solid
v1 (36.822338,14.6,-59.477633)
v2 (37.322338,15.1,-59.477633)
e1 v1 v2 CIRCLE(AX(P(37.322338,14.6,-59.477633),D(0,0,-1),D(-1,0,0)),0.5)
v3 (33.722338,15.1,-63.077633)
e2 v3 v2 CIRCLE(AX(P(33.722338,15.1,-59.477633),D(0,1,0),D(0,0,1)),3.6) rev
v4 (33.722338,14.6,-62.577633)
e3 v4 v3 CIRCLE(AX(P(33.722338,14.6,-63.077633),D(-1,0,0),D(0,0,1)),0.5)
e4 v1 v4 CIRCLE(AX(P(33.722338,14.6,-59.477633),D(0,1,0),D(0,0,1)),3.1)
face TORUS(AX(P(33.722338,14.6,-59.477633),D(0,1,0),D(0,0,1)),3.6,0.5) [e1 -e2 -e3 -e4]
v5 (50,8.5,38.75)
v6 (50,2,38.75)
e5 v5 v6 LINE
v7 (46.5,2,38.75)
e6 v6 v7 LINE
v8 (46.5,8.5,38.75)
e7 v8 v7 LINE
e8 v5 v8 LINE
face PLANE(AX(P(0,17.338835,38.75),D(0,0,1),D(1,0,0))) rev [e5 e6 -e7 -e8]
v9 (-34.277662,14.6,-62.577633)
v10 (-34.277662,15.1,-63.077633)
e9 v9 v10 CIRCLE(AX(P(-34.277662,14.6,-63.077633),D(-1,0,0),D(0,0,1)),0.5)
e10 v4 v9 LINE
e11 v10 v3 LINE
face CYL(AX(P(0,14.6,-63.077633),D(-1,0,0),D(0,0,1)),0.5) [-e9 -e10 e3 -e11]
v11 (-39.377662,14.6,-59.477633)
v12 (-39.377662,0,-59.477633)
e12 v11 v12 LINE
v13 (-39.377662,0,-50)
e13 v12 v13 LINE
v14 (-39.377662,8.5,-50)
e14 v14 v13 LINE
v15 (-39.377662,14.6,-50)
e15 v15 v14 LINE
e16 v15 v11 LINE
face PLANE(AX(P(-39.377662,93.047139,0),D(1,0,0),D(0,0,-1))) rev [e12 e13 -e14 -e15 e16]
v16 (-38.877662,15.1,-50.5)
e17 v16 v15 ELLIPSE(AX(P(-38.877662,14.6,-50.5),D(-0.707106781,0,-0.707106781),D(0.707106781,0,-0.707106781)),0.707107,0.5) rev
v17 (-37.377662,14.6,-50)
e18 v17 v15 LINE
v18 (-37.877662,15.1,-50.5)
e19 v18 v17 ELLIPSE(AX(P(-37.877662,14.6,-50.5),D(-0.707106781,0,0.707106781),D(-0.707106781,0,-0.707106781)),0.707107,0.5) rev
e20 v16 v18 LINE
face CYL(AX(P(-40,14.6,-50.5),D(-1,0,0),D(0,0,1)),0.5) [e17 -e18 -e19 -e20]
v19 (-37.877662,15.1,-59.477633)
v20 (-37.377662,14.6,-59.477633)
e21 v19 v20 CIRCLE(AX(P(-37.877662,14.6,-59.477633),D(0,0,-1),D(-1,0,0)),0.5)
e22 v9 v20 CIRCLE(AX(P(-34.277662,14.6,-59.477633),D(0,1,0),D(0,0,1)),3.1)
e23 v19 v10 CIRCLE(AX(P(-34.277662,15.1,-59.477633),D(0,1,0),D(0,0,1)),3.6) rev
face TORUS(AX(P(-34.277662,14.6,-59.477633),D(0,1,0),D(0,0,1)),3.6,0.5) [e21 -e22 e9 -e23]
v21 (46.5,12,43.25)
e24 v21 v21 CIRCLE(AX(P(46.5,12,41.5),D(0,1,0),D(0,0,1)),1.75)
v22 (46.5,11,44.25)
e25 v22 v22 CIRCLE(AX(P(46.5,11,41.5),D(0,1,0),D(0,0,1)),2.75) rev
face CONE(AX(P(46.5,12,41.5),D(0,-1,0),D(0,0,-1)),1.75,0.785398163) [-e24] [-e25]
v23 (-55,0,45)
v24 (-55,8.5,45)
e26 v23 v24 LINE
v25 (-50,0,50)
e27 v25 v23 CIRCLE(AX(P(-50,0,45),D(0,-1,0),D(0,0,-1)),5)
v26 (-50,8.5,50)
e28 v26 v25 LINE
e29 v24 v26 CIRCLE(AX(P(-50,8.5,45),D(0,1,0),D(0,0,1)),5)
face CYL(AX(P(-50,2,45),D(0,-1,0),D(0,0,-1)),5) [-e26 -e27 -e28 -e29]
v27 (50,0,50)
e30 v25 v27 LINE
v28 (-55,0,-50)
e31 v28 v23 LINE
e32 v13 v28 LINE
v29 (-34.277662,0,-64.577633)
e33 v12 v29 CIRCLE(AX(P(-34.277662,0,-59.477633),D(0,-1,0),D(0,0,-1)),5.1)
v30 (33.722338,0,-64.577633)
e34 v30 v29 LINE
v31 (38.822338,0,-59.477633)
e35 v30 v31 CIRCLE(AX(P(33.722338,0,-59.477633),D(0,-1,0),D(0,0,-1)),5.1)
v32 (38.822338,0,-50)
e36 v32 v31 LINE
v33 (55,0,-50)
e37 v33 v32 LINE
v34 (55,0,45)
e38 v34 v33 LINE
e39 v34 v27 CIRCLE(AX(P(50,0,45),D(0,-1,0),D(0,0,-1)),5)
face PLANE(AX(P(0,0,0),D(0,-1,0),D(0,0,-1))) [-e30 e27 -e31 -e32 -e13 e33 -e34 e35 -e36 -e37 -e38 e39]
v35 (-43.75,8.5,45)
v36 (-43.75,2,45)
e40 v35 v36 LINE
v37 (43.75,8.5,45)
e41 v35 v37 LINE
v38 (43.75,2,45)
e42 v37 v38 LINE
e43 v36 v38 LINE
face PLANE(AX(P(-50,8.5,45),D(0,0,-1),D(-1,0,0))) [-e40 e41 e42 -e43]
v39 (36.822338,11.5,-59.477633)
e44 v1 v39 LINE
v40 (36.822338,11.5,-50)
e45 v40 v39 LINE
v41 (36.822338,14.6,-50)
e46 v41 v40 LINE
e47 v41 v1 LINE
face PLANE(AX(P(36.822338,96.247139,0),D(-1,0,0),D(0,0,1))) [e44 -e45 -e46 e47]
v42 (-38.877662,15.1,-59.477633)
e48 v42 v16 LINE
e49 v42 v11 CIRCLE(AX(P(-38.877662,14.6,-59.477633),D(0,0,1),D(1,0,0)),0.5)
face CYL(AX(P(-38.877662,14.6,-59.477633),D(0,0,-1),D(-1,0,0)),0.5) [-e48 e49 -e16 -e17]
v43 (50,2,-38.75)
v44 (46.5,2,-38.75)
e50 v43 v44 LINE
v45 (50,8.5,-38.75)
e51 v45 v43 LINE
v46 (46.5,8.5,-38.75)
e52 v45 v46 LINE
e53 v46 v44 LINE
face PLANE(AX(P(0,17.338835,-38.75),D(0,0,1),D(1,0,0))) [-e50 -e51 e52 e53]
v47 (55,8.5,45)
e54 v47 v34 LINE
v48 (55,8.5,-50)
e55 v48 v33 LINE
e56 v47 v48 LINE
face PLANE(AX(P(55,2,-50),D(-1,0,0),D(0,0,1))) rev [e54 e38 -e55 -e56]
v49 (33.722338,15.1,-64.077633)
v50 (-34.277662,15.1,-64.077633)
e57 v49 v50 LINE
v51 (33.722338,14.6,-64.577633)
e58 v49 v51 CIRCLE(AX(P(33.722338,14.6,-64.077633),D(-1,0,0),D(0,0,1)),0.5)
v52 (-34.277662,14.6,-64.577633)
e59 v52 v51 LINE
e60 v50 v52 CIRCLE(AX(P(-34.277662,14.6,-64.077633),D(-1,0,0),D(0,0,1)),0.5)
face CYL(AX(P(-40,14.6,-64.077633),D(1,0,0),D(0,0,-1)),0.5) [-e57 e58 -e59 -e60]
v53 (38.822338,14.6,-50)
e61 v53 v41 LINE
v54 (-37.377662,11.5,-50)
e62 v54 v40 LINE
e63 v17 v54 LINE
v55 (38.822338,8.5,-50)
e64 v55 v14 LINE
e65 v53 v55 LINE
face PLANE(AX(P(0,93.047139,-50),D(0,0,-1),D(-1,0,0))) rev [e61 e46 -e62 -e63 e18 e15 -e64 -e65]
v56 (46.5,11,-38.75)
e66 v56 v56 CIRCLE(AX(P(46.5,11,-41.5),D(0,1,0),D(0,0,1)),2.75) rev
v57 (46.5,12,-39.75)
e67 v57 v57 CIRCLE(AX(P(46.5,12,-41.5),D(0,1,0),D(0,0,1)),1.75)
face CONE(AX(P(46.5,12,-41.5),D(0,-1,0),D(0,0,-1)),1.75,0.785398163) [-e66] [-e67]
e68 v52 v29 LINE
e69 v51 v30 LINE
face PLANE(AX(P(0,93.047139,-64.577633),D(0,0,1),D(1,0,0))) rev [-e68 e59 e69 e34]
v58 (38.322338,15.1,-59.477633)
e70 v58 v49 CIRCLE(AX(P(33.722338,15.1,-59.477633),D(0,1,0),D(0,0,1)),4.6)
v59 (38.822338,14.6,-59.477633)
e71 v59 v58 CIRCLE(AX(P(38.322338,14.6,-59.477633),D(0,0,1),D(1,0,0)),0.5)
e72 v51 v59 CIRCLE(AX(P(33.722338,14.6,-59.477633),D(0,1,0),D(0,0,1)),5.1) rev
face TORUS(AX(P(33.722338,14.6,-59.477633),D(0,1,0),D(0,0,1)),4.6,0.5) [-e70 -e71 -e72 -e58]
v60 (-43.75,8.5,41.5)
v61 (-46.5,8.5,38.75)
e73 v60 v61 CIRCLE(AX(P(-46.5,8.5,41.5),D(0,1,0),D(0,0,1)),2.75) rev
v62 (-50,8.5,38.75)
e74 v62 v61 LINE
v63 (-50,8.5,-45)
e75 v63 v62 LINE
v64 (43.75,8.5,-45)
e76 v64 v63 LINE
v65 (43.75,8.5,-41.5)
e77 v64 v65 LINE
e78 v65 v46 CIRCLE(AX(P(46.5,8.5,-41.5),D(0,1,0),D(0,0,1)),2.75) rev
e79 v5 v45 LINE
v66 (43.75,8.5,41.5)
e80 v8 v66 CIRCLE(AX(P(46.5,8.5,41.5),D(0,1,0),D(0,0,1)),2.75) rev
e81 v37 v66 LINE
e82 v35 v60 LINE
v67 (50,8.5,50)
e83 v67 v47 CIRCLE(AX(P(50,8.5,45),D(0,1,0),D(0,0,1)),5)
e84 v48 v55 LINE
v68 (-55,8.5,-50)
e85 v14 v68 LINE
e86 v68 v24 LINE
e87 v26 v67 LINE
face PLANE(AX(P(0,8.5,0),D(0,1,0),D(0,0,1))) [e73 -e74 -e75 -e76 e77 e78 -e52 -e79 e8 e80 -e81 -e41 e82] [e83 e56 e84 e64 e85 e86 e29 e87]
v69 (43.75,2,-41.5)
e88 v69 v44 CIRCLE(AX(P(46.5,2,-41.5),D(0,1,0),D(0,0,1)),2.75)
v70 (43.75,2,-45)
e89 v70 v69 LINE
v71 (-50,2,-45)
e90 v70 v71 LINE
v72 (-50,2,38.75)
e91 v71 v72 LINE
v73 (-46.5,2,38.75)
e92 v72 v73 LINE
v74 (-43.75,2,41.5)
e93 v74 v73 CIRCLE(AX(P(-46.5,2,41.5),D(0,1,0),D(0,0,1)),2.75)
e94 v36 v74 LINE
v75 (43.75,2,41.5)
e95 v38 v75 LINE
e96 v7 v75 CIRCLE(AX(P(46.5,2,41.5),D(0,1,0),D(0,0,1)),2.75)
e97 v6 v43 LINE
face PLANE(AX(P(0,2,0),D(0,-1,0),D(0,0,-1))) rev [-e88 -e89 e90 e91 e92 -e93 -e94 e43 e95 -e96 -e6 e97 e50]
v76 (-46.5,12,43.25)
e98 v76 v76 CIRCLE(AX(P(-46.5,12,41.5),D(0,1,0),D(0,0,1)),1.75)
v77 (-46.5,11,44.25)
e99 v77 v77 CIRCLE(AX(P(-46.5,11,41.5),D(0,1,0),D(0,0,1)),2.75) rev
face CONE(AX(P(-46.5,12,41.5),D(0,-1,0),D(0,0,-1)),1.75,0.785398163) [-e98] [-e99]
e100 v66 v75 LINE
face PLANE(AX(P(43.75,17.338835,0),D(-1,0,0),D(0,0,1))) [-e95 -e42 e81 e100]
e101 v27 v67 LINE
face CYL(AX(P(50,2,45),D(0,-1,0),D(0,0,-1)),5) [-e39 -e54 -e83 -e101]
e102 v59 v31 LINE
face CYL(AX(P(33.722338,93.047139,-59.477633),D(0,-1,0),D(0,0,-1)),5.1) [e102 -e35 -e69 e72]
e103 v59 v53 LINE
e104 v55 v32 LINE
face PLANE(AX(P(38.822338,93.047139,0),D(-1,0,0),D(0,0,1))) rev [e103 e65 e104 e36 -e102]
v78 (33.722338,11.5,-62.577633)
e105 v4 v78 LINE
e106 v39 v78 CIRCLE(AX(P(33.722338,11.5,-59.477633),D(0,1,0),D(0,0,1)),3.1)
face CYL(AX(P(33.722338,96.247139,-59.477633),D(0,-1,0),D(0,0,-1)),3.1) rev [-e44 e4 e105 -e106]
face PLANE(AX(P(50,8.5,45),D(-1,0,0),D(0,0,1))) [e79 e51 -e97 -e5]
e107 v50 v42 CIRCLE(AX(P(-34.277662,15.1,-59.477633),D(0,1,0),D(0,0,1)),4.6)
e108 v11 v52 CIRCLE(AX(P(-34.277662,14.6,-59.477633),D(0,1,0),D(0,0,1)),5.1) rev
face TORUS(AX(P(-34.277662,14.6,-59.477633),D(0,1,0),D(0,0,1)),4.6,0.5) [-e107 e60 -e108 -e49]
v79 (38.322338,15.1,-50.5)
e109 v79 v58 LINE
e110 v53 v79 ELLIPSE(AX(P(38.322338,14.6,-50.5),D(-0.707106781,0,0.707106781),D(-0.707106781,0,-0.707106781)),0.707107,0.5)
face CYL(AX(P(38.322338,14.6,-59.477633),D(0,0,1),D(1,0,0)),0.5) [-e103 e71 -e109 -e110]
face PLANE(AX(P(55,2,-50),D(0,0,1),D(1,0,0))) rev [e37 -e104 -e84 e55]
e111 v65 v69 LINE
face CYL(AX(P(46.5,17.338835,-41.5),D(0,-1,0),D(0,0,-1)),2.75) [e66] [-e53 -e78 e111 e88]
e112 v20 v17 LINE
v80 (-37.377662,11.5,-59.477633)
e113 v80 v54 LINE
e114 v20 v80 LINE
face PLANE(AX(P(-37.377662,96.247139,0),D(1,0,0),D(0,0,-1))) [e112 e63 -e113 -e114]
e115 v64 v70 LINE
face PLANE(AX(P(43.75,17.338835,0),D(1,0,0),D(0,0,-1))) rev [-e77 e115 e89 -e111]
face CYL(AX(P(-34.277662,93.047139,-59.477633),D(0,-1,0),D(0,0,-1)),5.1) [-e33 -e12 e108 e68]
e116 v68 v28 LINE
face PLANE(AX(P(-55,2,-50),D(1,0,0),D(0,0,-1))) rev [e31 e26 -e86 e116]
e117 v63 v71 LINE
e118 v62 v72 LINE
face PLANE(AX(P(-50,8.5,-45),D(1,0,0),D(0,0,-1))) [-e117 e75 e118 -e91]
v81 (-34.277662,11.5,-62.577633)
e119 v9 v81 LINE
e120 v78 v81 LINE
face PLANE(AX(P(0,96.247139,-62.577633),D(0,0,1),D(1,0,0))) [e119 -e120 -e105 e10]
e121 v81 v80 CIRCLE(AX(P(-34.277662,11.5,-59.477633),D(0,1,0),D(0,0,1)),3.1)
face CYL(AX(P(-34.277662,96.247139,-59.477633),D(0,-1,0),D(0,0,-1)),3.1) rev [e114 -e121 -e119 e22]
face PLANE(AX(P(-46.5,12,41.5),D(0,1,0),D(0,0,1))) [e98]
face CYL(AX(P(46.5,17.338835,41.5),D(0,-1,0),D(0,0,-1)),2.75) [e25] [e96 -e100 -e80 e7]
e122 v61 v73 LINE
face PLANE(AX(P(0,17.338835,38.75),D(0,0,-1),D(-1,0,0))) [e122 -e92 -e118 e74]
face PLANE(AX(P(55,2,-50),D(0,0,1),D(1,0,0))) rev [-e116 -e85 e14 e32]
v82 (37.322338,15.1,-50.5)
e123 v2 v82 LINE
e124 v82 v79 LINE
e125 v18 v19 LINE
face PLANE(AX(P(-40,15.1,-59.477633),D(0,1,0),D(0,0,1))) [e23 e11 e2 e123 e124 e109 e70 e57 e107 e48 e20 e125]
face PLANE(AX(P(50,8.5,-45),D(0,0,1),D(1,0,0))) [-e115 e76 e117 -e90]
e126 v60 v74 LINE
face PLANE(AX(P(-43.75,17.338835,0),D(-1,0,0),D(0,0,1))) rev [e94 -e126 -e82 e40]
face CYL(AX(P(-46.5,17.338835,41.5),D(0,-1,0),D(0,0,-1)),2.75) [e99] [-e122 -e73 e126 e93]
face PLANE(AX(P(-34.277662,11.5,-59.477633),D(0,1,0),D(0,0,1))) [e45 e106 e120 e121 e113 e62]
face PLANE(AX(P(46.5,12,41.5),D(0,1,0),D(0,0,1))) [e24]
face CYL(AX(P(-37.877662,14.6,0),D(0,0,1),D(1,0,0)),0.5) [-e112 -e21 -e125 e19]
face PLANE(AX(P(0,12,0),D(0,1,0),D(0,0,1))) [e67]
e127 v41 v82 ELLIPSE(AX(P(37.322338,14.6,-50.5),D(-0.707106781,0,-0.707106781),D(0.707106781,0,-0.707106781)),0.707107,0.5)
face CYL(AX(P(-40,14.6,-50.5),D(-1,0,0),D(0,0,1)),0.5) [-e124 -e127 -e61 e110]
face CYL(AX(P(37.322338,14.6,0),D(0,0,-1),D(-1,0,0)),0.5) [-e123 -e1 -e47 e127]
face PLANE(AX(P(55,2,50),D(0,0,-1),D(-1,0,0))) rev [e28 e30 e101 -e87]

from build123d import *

# Parameters (mm, degrees)
SKETCH1_W           = 110
SKETCH1_H           = 100
BOSS_EXTRUDE1_DEPTH = 2
SKETCH2_W           = 110
SKETCH2_H           = 100
SKETCH2_W_2         = 100
SKETCH2_H_2         = 90
BOSS_EXTRUDE2_DEPTH = 6.5
BOSS_EXTRUDE3_DEPTH = 13.5
BOSS_EXTRUDE4_START = -15.1
BOSS_EXTRUDE4_DEPTH = 1.6
SKETCH4_R           = 2.75
BOSS_EXTRUDE5_DEPTH = 6.5
SKETCH4_3_R         = 2.75
BOSS_EXTRUDE6_DEPTH = 10
CHAMFER1_SIZE       = 1
FILLET1_R           = 5
FILLET2_R           = 0.5
CUT_EXTRUDE1_DEPTH  = 2


# Read off the part's stored shape, not the designer's step: Boss-Extrude4
with BuildPart() as part:
    # Sketch1 → Boss-Extrude1 (new body)
    with BuildSketch(Plane(origin=(0, 0, 0), x_dir=(1, 0, 0), z_dir=(0, 1, 0))):
        Rectangle(SKETCH1_W, SKETCH1_H)
    extrude(amount=BOSS_EXTRUDE1_DEPTH)

    # Sketch2 → Boss-Extrude2 (add)
    with BuildSketch(Plane(origin=(0, 2, 0), x_dir=(1, 0, 0), z_dir=(0, 1, 0))):
        Rectangle(SKETCH2_W, SKETCH2_H)
        Rectangle(SKETCH2_W_2, SKETCH2_H_2, mode=Mode.SUBTRACT)
    extrude(amount=BOSS_EXTRUDE2_DEPTH)

    # Sketch3 → Boss-Extrude3 (add)
    with BuildSketch(Plane.XZ):
        with BuildLine():
            Line((-39.37766222, -50), (-39.37766222, -59.477632813))
            ThreePointArc((-39.37766222, -59.477632813), (-37.883906804, -63.083877397), (-34.27766222, -64.577632813))
            Line((-34.27766222, -64.577632813), (33.72233778, -64.577632813))
            ThreePointArc((33.72233778, -64.577632813), (37.328582364, -63.083877397), (38.82233778, -59.477632813))
            Line((38.82233778, -59.477632813), (38.82233778, -50))
            Line((38.82233778, -50), (-39.37766222, -50))
        make_face()
    extrude(amount=-BOSS_EXTRUDE3_DEPTH)

    # Boss-Extrude4 outline → Boss-Extrude4 (add)
    with BuildSketch(Plane.XZ.offset(BOSS_EXTRUDE4_START)):
        with BuildLine():
            Line((38.82233778, -59.477632813), (38.82233778, -50))
            Line((38.82233778, -50), (36.82233778, -50))
            Line((36.82233778, -50), (36.82233778, -59.477632813))
            ThreePointArc((36.82233778, -59.477632813), (35.914368802, -61.669663835), (33.72233778, -62.577632813))
            Line((33.72233778, -62.577632813), (-34.27766222, -62.577632813))
            ThreePointArc((-34.27766222, -62.577632813), (-36.469693242, -61.669663835), (-37.37766222, -59.477632813))
            Line((-37.37766222, -59.477632813), (-37.37766222, -50))
            Line((-37.37766222, -50), (-39.37766222, -50))
            Line((-39.37766222, -50), (-39.37766222, -59.477632813))
            ThreePointArc((-39.37766222, -59.477632813), (-37.883906804, -63.083877397), (-34.27766222, -64.577632813))
            Line((-34.27766222, -64.577632813), (33.72233778, -64.577632813))
            ThreePointArc((33.72233778, -64.577632813), (37.328582364, -63.083877397), (38.82233778, -59.477632813))
        make_face()
    extrude(amount=BOSS_EXTRUDE4_DEPTH)

    # Sketch4 → Boss-Extrude5 (add)
    with BuildSketch(Plane(origin=(0, 2, 0), x_dir=(1, 0, 0), z_dir=(0, 1, 0))):
        with BuildLine():
            Line((-50, -38.75), (-50, -45))
            Line((-50, -45), (-43.75, -45))
            Line((-43.75, -45), (-43.75, -41.5))
            ThreePointArc((-43.75, -41.5), (-48.444543648, -43.444543648), (-46.5, -38.75))
            Line((-46.5, -38.75), (-50, -38.75))
        make_face()
        with Locations((-46.5, -41.5)):
            Circle(SKETCH4_R)
        with BuildLine():
            Line((43.75, -41.5), (43.75, -45))
            Line((43.75, -45), (50, -45))
            Line((50, -45), (50, -38.75))
            Line((50, -38.75), (46.5, -38.75))
            ThreePointArc((46.5, -38.75), (48.444543648, -39.555456352), (49.25, -41.5))
            ThreePointArc((49.25, -41.5), (46.5, -44.25), (43.75, -41.5))
        make_face()
        with Locations((46.5, -41.5)):
            Circle(SKETCH4_R)
        with Locations((46.5, 41.5)):
            Circle(SKETCH4_R)
        with BuildLine():
            Line((50, 45), (43.75, 45))
            Line((43.75, 45), (43.75, 41.5))
            ThreePointArc((43.75, 41.5), (46.5, 44.25), (49.25, 41.5))
            ThreePointArc((49.25, 41.5), (48.444543648, 39.555456352), (46.5, 38.75))
            Line((46.5, 38.75), (50, 38.75))
            Line((50, 38.75), (50, 45))
        make_face()
    extrude(amount=BOSS_EXTRUDE5_DEPTH)

    # Sketch4<3> → Boss-Extrude6 (add)
    with BuildSketch(Plane(origin=(0, 2, 0), x_dir=(1, 0, 0), z_dir=(0, 1, 0))):
        with Locations(Location((46.5, 41.5, 0), (0, 0, 270))):
            Circle(SKETCH4_3_R)
        with Locations(Location((46.5, -41.5, 0), (0, 0, 90))):
            Circle(SKETCH4_3_R)
        with Locations(Location((-46.5, -41.5, 0), (0, 0, 90))):
            Circle(SKETCH4_3_R)
    extrude(amount=BOSS_EXTRUDE6_DEPTH)

    # Chamfer1
    chamfer1_edges = [part.edges().sort_by_distance(p)[0] for p in [
        (46.5, 12, -44.25),
        (46.5, 12, 44.25),
        (-46.5, 12, 44.25),
    ]]
    chamfer(chamfer1_edges, length=CHAMFER1_SIZE)

    # Fillet1
    fillet1_edges = [part.edges().sort_by_distance(p)[0] for p in [
        (55, 4.25, 50),
        (-55, 4.25, 50),
    ]]
    fillet(fillet1_edges, radius=FILLET1_R)

    # Fillet2
    fillet2_edges = [part.edges().sort_by_distance(p)[0] for p in [
        (35.914368802, 15.1, -61.669663835),
        (37.82233778, 15.1, -50),
        (38.82233778, 15.1, -54.738816406),
        (-0.27766222, 15.1, -64.577632813),
        (-39.37766222, 15.1, -54.738816406),
        (-38.37766222, 15.1, -50),
        (-36.469693242, 15.1, -61.669663835),
        (-0.27766222, 15.1, -62.577632813),
        (-37.37766222, 15.1, -54.738816406),
        (-37.883906804, 15.1, -63.083877397),
        (37.328582364, 15.1, -63.083877397),
        (36.82233778, 15.1, -54.738816406),
    ]]
    fillet(fillet2_edges, radius=FILLET2_R)

    # Sketch5 → Cut-Extrude1 (cut)
    with BuildSketch(Plane(origin=(0, 13.5, 0), x_dir=(1, 0, 0), z_dir=(0, 1, 0))):
        with BuildLine():
            Line((-37.37766222, 59.477632813), (-37.37766222, 50))
            Line((-37.37766222, 50), (36.82233778, 50))
            Line((36.82233778, 50), (36.82233778, 59.477632813))
            ThreePointArc((36.82233778, 59.477632813), (35.914368802, 61.669663835), (33.72233778, 62.577632813))
            Line((33.72233778, 62.577632813), (-34.27766222, 62.577632813))
            ThreePointArc((-34.27766222, 62.577632813), (-36.469693242, 61.669663835), (-37.37766222, 59.477632813))
        make_face()
    extrude(amount=-CUT_EXTRUDE1_DEPTH, mode=Mode.SUBTRACT)


solid = part.part
